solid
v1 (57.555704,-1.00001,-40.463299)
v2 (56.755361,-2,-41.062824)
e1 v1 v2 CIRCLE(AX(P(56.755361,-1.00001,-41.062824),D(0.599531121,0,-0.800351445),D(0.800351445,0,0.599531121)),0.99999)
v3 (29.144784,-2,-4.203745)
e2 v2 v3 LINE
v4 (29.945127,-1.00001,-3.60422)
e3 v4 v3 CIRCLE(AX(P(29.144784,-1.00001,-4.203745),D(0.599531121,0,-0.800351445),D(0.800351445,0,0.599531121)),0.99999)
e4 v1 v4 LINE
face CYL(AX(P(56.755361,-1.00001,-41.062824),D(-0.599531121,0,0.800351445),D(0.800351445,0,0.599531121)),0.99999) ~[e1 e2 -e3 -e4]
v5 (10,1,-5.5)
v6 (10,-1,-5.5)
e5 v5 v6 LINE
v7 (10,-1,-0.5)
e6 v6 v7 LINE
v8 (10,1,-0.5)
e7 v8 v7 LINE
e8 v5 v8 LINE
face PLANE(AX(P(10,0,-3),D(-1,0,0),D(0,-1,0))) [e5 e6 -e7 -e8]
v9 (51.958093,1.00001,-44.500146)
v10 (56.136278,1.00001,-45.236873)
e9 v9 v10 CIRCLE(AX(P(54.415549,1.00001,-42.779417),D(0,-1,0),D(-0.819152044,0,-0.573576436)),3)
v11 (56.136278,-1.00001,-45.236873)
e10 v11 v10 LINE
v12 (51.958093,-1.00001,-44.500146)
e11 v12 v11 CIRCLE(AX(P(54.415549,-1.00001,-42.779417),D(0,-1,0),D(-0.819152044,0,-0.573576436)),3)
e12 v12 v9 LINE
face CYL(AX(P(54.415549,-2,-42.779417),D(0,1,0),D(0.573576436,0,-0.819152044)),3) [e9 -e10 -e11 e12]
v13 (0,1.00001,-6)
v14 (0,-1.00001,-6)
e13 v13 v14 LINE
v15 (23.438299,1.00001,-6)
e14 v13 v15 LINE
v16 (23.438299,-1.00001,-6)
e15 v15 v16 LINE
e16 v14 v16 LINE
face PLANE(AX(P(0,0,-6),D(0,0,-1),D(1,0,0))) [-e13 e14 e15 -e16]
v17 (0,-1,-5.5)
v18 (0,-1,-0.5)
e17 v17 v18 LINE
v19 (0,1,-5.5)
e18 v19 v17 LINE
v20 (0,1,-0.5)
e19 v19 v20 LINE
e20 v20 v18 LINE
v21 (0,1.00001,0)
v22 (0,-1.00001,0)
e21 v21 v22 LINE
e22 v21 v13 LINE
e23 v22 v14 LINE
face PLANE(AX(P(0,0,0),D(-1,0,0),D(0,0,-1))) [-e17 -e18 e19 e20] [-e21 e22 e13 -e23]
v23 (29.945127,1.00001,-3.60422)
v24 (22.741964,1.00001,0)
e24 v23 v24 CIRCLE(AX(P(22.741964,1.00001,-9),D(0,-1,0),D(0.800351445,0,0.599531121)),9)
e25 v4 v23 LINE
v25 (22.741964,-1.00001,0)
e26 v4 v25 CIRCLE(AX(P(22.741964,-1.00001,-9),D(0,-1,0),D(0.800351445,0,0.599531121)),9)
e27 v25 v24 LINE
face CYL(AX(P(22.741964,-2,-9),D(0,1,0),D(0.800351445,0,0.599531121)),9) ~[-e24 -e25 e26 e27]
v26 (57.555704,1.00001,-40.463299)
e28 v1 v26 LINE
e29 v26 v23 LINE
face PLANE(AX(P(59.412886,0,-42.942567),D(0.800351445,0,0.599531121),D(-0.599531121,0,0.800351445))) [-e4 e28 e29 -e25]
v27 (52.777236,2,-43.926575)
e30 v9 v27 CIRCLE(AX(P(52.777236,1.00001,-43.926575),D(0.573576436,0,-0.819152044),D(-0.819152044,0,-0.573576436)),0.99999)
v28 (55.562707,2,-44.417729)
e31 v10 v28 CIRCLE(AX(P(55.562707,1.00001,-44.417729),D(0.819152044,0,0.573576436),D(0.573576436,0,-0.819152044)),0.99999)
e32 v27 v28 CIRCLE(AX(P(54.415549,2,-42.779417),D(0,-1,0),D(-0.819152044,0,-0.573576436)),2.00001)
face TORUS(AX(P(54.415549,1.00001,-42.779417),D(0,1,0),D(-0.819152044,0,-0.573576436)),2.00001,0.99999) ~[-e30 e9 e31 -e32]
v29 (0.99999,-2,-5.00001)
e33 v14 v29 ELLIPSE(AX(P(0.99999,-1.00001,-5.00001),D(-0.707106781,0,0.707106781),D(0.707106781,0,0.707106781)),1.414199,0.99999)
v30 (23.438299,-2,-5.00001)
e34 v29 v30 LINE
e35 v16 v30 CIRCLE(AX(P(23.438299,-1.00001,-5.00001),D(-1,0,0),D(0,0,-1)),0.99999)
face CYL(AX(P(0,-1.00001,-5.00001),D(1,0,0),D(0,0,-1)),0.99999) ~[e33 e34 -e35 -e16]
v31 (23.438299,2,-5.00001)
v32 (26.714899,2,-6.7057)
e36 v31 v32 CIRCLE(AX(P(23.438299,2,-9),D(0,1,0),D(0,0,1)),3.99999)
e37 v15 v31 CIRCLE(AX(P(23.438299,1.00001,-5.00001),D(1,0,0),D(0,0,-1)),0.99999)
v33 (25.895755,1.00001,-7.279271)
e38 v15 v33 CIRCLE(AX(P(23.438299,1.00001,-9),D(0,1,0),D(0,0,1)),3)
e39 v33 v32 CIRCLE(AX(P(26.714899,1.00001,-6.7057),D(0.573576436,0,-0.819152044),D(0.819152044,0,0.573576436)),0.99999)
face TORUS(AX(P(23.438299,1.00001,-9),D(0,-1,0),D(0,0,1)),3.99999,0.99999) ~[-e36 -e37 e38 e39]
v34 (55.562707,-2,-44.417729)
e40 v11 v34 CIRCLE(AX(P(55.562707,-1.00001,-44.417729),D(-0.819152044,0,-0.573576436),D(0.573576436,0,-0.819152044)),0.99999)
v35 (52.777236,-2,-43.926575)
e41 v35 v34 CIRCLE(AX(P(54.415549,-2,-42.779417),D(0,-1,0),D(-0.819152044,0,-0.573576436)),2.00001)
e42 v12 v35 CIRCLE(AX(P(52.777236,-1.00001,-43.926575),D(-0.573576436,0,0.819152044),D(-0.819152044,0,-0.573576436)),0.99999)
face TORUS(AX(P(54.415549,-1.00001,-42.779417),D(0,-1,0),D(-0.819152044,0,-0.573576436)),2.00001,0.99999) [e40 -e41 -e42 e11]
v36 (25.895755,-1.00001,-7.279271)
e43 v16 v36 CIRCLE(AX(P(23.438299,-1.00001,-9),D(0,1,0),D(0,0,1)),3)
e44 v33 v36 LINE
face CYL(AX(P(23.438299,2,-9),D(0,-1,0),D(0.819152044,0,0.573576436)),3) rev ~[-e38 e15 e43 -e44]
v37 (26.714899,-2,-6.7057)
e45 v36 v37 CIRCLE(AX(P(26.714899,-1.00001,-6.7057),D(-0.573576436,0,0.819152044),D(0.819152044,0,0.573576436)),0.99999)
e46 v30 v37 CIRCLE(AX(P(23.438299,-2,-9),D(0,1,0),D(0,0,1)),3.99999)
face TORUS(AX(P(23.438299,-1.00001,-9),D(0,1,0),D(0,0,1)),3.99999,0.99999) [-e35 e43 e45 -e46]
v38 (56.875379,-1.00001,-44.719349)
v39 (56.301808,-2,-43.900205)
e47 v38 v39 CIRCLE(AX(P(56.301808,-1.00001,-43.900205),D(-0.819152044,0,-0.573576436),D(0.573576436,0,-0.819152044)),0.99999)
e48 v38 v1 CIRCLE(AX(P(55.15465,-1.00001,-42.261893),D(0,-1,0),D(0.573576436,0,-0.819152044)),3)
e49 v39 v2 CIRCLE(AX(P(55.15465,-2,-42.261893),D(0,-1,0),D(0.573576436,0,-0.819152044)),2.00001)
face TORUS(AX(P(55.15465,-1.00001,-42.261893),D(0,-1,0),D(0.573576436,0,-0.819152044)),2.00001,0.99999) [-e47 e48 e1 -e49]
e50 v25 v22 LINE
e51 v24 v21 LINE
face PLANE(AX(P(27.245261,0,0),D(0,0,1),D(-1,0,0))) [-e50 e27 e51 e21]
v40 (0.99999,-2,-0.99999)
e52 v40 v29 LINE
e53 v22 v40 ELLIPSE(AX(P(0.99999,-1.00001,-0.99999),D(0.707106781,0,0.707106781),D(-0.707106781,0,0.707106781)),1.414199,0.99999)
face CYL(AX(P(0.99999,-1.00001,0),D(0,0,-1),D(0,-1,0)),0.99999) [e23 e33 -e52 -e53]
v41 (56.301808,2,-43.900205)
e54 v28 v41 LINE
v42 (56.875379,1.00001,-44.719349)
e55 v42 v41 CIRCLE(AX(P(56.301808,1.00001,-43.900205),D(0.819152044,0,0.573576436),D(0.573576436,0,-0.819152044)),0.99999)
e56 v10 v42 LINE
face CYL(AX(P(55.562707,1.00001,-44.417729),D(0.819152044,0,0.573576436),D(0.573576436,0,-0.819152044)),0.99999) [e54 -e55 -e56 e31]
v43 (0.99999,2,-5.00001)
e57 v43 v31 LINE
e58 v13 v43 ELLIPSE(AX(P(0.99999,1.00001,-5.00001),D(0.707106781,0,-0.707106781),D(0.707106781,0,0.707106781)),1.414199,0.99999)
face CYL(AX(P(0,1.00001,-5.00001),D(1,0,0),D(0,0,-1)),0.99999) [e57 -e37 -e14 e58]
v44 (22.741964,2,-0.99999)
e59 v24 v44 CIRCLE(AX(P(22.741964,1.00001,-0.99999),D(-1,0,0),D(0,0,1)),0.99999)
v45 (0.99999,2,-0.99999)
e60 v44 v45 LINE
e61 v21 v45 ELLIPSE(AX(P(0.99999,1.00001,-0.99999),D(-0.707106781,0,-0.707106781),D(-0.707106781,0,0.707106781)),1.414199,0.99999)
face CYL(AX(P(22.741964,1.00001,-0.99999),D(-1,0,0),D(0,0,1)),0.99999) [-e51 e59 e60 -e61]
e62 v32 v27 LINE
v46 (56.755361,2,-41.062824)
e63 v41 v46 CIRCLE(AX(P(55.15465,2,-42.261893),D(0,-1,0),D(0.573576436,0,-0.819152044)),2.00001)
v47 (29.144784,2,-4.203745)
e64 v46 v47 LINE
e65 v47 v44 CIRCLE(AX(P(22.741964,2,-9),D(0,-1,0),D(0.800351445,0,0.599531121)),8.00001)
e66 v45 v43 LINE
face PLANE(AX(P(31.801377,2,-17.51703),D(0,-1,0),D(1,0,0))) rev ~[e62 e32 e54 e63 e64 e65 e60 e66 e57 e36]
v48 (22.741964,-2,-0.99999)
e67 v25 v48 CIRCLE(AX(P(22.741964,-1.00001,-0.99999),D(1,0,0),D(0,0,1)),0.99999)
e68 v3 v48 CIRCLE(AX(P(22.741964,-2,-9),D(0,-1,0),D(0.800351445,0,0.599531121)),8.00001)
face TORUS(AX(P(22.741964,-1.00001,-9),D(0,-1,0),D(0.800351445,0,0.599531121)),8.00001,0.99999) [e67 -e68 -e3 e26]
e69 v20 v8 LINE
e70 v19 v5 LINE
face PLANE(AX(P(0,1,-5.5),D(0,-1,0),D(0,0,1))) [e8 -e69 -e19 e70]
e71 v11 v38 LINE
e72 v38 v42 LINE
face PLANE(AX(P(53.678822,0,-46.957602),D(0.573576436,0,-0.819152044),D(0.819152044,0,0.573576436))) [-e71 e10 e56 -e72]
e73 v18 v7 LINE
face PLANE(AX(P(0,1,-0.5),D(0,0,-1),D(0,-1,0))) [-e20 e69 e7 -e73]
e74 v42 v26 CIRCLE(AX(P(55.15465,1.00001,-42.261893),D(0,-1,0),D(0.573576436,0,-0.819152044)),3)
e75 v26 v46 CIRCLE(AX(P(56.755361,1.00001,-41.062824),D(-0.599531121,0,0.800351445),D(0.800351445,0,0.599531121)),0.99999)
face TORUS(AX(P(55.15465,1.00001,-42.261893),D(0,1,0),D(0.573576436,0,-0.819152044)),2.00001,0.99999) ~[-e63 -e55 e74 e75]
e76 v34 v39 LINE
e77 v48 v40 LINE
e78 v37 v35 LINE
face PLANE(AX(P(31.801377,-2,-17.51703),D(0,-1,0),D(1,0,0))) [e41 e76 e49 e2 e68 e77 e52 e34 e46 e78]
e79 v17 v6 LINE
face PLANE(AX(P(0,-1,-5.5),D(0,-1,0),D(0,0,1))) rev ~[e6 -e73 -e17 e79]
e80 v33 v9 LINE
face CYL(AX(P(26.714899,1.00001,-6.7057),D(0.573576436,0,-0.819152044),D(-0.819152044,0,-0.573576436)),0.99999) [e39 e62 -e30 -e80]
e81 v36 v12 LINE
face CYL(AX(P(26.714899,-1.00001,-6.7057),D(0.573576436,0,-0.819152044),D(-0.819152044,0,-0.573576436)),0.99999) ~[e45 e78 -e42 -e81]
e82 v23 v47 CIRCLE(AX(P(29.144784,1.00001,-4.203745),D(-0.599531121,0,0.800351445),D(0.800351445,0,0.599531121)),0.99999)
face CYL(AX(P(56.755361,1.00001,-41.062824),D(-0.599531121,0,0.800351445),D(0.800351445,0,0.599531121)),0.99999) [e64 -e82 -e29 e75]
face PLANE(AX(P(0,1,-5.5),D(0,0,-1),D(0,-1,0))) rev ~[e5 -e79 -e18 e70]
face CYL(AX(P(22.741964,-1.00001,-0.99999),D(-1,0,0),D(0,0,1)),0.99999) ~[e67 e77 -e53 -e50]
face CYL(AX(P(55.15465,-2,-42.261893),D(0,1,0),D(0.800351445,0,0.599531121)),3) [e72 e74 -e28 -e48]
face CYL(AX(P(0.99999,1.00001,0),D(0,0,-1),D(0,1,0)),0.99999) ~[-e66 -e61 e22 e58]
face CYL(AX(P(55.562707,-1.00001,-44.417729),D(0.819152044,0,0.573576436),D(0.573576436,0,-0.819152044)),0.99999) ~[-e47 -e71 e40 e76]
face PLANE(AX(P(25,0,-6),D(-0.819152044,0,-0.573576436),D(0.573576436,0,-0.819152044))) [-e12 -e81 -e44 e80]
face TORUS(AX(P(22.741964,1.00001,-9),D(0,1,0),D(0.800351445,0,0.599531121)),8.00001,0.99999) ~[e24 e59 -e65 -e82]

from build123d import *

# Parameters (mm, degrees)
F1_DEPTH = 2
F2_R     = 3
F3_R     = 9
F4_W     = 2
F4_H     = 5
F5_DEPTH = 10
F6_R     = 0.99999


# Not quite as in the source:
# - a fillet or chamfer is up to 0.001 mm smaller than in the source, because OpenCascade refuses the exact size


with BuildPart() as f1:
    # F0 (on Front) → F1 (new body, symmetric)
    with BuildSketch(Plane.XZ):
        Polygon((27.2452607751, 0), (0, 0), (0, -6), (25, -6), (53.6788218176, -46.9576022144), (59.4128861276, -42.94256716), align=None)
    extrude(amount=F1_DEPTH, both=True)

    # F2
    f2_edges = [f1.edges().sort_by_distance(p)[0] for p in [
        (25, 0, -6),
        (53.678822, 0, -46.957602),
        (59.412886, 0, -42.942567),
    ]]
    fillet(f2_edges, radius=F2_R)

    # F3
    f3_edges = [f1.edges().sort_by_distance(p)[0] for p in [
        (27.245261, 0, 0),
    ]]
    fillet(f3_edges, radius=F3_R)

    # F4 (on face) → F5 (cut)
    with BuildSketch(Plane(origin=(0, 0, 0), x_dir=(0, -1, 0), z_dir=(-1, 0, 0))):
        with Locations((0, -3)):
            Rectangle(F4_W, F4_H)
    extrude(amount=-F5_DEPTH, mode=Mode.SUBTRACT)

    # F6 (radius 1 in the source; OpenCascade refuses exactly that, so slightly less here)
    f6_edges = [f1.edges().sort_by_distance(p)[0] for p in [
        (43.750416, -2, -22.03376),
        (26.769245, -2, -0.951335),
        (58.117041, -2, -42.735428),
        (11.370982, -2, 0),
        (56.505829, -2, -44.978111),
        (0, -2, -3),
        (53.894604, -2, -45.73384),
        (11.719149, -2, -6),
        (38.926924, -2, -25.889708),
        (24.823545, -2, -6.338968),
        (43.750416, 2, -22.03376),
        (26.769245, 2, -0.951335),
        (58.117041, 2, -42.735428),
        (11.370982, 2, 0),
        (56.505829, 2, -44.978111),
        (0, 2, -3),
        (53.894604, 2, -45.73384),
        (11.719149, 2, -6),
        (38.926924, 2, -25.889708),
        (24.823545, 2, -6.338968),
    ]]
    fillet(f6_edges, radius=F6_R)


solid = f1.part
